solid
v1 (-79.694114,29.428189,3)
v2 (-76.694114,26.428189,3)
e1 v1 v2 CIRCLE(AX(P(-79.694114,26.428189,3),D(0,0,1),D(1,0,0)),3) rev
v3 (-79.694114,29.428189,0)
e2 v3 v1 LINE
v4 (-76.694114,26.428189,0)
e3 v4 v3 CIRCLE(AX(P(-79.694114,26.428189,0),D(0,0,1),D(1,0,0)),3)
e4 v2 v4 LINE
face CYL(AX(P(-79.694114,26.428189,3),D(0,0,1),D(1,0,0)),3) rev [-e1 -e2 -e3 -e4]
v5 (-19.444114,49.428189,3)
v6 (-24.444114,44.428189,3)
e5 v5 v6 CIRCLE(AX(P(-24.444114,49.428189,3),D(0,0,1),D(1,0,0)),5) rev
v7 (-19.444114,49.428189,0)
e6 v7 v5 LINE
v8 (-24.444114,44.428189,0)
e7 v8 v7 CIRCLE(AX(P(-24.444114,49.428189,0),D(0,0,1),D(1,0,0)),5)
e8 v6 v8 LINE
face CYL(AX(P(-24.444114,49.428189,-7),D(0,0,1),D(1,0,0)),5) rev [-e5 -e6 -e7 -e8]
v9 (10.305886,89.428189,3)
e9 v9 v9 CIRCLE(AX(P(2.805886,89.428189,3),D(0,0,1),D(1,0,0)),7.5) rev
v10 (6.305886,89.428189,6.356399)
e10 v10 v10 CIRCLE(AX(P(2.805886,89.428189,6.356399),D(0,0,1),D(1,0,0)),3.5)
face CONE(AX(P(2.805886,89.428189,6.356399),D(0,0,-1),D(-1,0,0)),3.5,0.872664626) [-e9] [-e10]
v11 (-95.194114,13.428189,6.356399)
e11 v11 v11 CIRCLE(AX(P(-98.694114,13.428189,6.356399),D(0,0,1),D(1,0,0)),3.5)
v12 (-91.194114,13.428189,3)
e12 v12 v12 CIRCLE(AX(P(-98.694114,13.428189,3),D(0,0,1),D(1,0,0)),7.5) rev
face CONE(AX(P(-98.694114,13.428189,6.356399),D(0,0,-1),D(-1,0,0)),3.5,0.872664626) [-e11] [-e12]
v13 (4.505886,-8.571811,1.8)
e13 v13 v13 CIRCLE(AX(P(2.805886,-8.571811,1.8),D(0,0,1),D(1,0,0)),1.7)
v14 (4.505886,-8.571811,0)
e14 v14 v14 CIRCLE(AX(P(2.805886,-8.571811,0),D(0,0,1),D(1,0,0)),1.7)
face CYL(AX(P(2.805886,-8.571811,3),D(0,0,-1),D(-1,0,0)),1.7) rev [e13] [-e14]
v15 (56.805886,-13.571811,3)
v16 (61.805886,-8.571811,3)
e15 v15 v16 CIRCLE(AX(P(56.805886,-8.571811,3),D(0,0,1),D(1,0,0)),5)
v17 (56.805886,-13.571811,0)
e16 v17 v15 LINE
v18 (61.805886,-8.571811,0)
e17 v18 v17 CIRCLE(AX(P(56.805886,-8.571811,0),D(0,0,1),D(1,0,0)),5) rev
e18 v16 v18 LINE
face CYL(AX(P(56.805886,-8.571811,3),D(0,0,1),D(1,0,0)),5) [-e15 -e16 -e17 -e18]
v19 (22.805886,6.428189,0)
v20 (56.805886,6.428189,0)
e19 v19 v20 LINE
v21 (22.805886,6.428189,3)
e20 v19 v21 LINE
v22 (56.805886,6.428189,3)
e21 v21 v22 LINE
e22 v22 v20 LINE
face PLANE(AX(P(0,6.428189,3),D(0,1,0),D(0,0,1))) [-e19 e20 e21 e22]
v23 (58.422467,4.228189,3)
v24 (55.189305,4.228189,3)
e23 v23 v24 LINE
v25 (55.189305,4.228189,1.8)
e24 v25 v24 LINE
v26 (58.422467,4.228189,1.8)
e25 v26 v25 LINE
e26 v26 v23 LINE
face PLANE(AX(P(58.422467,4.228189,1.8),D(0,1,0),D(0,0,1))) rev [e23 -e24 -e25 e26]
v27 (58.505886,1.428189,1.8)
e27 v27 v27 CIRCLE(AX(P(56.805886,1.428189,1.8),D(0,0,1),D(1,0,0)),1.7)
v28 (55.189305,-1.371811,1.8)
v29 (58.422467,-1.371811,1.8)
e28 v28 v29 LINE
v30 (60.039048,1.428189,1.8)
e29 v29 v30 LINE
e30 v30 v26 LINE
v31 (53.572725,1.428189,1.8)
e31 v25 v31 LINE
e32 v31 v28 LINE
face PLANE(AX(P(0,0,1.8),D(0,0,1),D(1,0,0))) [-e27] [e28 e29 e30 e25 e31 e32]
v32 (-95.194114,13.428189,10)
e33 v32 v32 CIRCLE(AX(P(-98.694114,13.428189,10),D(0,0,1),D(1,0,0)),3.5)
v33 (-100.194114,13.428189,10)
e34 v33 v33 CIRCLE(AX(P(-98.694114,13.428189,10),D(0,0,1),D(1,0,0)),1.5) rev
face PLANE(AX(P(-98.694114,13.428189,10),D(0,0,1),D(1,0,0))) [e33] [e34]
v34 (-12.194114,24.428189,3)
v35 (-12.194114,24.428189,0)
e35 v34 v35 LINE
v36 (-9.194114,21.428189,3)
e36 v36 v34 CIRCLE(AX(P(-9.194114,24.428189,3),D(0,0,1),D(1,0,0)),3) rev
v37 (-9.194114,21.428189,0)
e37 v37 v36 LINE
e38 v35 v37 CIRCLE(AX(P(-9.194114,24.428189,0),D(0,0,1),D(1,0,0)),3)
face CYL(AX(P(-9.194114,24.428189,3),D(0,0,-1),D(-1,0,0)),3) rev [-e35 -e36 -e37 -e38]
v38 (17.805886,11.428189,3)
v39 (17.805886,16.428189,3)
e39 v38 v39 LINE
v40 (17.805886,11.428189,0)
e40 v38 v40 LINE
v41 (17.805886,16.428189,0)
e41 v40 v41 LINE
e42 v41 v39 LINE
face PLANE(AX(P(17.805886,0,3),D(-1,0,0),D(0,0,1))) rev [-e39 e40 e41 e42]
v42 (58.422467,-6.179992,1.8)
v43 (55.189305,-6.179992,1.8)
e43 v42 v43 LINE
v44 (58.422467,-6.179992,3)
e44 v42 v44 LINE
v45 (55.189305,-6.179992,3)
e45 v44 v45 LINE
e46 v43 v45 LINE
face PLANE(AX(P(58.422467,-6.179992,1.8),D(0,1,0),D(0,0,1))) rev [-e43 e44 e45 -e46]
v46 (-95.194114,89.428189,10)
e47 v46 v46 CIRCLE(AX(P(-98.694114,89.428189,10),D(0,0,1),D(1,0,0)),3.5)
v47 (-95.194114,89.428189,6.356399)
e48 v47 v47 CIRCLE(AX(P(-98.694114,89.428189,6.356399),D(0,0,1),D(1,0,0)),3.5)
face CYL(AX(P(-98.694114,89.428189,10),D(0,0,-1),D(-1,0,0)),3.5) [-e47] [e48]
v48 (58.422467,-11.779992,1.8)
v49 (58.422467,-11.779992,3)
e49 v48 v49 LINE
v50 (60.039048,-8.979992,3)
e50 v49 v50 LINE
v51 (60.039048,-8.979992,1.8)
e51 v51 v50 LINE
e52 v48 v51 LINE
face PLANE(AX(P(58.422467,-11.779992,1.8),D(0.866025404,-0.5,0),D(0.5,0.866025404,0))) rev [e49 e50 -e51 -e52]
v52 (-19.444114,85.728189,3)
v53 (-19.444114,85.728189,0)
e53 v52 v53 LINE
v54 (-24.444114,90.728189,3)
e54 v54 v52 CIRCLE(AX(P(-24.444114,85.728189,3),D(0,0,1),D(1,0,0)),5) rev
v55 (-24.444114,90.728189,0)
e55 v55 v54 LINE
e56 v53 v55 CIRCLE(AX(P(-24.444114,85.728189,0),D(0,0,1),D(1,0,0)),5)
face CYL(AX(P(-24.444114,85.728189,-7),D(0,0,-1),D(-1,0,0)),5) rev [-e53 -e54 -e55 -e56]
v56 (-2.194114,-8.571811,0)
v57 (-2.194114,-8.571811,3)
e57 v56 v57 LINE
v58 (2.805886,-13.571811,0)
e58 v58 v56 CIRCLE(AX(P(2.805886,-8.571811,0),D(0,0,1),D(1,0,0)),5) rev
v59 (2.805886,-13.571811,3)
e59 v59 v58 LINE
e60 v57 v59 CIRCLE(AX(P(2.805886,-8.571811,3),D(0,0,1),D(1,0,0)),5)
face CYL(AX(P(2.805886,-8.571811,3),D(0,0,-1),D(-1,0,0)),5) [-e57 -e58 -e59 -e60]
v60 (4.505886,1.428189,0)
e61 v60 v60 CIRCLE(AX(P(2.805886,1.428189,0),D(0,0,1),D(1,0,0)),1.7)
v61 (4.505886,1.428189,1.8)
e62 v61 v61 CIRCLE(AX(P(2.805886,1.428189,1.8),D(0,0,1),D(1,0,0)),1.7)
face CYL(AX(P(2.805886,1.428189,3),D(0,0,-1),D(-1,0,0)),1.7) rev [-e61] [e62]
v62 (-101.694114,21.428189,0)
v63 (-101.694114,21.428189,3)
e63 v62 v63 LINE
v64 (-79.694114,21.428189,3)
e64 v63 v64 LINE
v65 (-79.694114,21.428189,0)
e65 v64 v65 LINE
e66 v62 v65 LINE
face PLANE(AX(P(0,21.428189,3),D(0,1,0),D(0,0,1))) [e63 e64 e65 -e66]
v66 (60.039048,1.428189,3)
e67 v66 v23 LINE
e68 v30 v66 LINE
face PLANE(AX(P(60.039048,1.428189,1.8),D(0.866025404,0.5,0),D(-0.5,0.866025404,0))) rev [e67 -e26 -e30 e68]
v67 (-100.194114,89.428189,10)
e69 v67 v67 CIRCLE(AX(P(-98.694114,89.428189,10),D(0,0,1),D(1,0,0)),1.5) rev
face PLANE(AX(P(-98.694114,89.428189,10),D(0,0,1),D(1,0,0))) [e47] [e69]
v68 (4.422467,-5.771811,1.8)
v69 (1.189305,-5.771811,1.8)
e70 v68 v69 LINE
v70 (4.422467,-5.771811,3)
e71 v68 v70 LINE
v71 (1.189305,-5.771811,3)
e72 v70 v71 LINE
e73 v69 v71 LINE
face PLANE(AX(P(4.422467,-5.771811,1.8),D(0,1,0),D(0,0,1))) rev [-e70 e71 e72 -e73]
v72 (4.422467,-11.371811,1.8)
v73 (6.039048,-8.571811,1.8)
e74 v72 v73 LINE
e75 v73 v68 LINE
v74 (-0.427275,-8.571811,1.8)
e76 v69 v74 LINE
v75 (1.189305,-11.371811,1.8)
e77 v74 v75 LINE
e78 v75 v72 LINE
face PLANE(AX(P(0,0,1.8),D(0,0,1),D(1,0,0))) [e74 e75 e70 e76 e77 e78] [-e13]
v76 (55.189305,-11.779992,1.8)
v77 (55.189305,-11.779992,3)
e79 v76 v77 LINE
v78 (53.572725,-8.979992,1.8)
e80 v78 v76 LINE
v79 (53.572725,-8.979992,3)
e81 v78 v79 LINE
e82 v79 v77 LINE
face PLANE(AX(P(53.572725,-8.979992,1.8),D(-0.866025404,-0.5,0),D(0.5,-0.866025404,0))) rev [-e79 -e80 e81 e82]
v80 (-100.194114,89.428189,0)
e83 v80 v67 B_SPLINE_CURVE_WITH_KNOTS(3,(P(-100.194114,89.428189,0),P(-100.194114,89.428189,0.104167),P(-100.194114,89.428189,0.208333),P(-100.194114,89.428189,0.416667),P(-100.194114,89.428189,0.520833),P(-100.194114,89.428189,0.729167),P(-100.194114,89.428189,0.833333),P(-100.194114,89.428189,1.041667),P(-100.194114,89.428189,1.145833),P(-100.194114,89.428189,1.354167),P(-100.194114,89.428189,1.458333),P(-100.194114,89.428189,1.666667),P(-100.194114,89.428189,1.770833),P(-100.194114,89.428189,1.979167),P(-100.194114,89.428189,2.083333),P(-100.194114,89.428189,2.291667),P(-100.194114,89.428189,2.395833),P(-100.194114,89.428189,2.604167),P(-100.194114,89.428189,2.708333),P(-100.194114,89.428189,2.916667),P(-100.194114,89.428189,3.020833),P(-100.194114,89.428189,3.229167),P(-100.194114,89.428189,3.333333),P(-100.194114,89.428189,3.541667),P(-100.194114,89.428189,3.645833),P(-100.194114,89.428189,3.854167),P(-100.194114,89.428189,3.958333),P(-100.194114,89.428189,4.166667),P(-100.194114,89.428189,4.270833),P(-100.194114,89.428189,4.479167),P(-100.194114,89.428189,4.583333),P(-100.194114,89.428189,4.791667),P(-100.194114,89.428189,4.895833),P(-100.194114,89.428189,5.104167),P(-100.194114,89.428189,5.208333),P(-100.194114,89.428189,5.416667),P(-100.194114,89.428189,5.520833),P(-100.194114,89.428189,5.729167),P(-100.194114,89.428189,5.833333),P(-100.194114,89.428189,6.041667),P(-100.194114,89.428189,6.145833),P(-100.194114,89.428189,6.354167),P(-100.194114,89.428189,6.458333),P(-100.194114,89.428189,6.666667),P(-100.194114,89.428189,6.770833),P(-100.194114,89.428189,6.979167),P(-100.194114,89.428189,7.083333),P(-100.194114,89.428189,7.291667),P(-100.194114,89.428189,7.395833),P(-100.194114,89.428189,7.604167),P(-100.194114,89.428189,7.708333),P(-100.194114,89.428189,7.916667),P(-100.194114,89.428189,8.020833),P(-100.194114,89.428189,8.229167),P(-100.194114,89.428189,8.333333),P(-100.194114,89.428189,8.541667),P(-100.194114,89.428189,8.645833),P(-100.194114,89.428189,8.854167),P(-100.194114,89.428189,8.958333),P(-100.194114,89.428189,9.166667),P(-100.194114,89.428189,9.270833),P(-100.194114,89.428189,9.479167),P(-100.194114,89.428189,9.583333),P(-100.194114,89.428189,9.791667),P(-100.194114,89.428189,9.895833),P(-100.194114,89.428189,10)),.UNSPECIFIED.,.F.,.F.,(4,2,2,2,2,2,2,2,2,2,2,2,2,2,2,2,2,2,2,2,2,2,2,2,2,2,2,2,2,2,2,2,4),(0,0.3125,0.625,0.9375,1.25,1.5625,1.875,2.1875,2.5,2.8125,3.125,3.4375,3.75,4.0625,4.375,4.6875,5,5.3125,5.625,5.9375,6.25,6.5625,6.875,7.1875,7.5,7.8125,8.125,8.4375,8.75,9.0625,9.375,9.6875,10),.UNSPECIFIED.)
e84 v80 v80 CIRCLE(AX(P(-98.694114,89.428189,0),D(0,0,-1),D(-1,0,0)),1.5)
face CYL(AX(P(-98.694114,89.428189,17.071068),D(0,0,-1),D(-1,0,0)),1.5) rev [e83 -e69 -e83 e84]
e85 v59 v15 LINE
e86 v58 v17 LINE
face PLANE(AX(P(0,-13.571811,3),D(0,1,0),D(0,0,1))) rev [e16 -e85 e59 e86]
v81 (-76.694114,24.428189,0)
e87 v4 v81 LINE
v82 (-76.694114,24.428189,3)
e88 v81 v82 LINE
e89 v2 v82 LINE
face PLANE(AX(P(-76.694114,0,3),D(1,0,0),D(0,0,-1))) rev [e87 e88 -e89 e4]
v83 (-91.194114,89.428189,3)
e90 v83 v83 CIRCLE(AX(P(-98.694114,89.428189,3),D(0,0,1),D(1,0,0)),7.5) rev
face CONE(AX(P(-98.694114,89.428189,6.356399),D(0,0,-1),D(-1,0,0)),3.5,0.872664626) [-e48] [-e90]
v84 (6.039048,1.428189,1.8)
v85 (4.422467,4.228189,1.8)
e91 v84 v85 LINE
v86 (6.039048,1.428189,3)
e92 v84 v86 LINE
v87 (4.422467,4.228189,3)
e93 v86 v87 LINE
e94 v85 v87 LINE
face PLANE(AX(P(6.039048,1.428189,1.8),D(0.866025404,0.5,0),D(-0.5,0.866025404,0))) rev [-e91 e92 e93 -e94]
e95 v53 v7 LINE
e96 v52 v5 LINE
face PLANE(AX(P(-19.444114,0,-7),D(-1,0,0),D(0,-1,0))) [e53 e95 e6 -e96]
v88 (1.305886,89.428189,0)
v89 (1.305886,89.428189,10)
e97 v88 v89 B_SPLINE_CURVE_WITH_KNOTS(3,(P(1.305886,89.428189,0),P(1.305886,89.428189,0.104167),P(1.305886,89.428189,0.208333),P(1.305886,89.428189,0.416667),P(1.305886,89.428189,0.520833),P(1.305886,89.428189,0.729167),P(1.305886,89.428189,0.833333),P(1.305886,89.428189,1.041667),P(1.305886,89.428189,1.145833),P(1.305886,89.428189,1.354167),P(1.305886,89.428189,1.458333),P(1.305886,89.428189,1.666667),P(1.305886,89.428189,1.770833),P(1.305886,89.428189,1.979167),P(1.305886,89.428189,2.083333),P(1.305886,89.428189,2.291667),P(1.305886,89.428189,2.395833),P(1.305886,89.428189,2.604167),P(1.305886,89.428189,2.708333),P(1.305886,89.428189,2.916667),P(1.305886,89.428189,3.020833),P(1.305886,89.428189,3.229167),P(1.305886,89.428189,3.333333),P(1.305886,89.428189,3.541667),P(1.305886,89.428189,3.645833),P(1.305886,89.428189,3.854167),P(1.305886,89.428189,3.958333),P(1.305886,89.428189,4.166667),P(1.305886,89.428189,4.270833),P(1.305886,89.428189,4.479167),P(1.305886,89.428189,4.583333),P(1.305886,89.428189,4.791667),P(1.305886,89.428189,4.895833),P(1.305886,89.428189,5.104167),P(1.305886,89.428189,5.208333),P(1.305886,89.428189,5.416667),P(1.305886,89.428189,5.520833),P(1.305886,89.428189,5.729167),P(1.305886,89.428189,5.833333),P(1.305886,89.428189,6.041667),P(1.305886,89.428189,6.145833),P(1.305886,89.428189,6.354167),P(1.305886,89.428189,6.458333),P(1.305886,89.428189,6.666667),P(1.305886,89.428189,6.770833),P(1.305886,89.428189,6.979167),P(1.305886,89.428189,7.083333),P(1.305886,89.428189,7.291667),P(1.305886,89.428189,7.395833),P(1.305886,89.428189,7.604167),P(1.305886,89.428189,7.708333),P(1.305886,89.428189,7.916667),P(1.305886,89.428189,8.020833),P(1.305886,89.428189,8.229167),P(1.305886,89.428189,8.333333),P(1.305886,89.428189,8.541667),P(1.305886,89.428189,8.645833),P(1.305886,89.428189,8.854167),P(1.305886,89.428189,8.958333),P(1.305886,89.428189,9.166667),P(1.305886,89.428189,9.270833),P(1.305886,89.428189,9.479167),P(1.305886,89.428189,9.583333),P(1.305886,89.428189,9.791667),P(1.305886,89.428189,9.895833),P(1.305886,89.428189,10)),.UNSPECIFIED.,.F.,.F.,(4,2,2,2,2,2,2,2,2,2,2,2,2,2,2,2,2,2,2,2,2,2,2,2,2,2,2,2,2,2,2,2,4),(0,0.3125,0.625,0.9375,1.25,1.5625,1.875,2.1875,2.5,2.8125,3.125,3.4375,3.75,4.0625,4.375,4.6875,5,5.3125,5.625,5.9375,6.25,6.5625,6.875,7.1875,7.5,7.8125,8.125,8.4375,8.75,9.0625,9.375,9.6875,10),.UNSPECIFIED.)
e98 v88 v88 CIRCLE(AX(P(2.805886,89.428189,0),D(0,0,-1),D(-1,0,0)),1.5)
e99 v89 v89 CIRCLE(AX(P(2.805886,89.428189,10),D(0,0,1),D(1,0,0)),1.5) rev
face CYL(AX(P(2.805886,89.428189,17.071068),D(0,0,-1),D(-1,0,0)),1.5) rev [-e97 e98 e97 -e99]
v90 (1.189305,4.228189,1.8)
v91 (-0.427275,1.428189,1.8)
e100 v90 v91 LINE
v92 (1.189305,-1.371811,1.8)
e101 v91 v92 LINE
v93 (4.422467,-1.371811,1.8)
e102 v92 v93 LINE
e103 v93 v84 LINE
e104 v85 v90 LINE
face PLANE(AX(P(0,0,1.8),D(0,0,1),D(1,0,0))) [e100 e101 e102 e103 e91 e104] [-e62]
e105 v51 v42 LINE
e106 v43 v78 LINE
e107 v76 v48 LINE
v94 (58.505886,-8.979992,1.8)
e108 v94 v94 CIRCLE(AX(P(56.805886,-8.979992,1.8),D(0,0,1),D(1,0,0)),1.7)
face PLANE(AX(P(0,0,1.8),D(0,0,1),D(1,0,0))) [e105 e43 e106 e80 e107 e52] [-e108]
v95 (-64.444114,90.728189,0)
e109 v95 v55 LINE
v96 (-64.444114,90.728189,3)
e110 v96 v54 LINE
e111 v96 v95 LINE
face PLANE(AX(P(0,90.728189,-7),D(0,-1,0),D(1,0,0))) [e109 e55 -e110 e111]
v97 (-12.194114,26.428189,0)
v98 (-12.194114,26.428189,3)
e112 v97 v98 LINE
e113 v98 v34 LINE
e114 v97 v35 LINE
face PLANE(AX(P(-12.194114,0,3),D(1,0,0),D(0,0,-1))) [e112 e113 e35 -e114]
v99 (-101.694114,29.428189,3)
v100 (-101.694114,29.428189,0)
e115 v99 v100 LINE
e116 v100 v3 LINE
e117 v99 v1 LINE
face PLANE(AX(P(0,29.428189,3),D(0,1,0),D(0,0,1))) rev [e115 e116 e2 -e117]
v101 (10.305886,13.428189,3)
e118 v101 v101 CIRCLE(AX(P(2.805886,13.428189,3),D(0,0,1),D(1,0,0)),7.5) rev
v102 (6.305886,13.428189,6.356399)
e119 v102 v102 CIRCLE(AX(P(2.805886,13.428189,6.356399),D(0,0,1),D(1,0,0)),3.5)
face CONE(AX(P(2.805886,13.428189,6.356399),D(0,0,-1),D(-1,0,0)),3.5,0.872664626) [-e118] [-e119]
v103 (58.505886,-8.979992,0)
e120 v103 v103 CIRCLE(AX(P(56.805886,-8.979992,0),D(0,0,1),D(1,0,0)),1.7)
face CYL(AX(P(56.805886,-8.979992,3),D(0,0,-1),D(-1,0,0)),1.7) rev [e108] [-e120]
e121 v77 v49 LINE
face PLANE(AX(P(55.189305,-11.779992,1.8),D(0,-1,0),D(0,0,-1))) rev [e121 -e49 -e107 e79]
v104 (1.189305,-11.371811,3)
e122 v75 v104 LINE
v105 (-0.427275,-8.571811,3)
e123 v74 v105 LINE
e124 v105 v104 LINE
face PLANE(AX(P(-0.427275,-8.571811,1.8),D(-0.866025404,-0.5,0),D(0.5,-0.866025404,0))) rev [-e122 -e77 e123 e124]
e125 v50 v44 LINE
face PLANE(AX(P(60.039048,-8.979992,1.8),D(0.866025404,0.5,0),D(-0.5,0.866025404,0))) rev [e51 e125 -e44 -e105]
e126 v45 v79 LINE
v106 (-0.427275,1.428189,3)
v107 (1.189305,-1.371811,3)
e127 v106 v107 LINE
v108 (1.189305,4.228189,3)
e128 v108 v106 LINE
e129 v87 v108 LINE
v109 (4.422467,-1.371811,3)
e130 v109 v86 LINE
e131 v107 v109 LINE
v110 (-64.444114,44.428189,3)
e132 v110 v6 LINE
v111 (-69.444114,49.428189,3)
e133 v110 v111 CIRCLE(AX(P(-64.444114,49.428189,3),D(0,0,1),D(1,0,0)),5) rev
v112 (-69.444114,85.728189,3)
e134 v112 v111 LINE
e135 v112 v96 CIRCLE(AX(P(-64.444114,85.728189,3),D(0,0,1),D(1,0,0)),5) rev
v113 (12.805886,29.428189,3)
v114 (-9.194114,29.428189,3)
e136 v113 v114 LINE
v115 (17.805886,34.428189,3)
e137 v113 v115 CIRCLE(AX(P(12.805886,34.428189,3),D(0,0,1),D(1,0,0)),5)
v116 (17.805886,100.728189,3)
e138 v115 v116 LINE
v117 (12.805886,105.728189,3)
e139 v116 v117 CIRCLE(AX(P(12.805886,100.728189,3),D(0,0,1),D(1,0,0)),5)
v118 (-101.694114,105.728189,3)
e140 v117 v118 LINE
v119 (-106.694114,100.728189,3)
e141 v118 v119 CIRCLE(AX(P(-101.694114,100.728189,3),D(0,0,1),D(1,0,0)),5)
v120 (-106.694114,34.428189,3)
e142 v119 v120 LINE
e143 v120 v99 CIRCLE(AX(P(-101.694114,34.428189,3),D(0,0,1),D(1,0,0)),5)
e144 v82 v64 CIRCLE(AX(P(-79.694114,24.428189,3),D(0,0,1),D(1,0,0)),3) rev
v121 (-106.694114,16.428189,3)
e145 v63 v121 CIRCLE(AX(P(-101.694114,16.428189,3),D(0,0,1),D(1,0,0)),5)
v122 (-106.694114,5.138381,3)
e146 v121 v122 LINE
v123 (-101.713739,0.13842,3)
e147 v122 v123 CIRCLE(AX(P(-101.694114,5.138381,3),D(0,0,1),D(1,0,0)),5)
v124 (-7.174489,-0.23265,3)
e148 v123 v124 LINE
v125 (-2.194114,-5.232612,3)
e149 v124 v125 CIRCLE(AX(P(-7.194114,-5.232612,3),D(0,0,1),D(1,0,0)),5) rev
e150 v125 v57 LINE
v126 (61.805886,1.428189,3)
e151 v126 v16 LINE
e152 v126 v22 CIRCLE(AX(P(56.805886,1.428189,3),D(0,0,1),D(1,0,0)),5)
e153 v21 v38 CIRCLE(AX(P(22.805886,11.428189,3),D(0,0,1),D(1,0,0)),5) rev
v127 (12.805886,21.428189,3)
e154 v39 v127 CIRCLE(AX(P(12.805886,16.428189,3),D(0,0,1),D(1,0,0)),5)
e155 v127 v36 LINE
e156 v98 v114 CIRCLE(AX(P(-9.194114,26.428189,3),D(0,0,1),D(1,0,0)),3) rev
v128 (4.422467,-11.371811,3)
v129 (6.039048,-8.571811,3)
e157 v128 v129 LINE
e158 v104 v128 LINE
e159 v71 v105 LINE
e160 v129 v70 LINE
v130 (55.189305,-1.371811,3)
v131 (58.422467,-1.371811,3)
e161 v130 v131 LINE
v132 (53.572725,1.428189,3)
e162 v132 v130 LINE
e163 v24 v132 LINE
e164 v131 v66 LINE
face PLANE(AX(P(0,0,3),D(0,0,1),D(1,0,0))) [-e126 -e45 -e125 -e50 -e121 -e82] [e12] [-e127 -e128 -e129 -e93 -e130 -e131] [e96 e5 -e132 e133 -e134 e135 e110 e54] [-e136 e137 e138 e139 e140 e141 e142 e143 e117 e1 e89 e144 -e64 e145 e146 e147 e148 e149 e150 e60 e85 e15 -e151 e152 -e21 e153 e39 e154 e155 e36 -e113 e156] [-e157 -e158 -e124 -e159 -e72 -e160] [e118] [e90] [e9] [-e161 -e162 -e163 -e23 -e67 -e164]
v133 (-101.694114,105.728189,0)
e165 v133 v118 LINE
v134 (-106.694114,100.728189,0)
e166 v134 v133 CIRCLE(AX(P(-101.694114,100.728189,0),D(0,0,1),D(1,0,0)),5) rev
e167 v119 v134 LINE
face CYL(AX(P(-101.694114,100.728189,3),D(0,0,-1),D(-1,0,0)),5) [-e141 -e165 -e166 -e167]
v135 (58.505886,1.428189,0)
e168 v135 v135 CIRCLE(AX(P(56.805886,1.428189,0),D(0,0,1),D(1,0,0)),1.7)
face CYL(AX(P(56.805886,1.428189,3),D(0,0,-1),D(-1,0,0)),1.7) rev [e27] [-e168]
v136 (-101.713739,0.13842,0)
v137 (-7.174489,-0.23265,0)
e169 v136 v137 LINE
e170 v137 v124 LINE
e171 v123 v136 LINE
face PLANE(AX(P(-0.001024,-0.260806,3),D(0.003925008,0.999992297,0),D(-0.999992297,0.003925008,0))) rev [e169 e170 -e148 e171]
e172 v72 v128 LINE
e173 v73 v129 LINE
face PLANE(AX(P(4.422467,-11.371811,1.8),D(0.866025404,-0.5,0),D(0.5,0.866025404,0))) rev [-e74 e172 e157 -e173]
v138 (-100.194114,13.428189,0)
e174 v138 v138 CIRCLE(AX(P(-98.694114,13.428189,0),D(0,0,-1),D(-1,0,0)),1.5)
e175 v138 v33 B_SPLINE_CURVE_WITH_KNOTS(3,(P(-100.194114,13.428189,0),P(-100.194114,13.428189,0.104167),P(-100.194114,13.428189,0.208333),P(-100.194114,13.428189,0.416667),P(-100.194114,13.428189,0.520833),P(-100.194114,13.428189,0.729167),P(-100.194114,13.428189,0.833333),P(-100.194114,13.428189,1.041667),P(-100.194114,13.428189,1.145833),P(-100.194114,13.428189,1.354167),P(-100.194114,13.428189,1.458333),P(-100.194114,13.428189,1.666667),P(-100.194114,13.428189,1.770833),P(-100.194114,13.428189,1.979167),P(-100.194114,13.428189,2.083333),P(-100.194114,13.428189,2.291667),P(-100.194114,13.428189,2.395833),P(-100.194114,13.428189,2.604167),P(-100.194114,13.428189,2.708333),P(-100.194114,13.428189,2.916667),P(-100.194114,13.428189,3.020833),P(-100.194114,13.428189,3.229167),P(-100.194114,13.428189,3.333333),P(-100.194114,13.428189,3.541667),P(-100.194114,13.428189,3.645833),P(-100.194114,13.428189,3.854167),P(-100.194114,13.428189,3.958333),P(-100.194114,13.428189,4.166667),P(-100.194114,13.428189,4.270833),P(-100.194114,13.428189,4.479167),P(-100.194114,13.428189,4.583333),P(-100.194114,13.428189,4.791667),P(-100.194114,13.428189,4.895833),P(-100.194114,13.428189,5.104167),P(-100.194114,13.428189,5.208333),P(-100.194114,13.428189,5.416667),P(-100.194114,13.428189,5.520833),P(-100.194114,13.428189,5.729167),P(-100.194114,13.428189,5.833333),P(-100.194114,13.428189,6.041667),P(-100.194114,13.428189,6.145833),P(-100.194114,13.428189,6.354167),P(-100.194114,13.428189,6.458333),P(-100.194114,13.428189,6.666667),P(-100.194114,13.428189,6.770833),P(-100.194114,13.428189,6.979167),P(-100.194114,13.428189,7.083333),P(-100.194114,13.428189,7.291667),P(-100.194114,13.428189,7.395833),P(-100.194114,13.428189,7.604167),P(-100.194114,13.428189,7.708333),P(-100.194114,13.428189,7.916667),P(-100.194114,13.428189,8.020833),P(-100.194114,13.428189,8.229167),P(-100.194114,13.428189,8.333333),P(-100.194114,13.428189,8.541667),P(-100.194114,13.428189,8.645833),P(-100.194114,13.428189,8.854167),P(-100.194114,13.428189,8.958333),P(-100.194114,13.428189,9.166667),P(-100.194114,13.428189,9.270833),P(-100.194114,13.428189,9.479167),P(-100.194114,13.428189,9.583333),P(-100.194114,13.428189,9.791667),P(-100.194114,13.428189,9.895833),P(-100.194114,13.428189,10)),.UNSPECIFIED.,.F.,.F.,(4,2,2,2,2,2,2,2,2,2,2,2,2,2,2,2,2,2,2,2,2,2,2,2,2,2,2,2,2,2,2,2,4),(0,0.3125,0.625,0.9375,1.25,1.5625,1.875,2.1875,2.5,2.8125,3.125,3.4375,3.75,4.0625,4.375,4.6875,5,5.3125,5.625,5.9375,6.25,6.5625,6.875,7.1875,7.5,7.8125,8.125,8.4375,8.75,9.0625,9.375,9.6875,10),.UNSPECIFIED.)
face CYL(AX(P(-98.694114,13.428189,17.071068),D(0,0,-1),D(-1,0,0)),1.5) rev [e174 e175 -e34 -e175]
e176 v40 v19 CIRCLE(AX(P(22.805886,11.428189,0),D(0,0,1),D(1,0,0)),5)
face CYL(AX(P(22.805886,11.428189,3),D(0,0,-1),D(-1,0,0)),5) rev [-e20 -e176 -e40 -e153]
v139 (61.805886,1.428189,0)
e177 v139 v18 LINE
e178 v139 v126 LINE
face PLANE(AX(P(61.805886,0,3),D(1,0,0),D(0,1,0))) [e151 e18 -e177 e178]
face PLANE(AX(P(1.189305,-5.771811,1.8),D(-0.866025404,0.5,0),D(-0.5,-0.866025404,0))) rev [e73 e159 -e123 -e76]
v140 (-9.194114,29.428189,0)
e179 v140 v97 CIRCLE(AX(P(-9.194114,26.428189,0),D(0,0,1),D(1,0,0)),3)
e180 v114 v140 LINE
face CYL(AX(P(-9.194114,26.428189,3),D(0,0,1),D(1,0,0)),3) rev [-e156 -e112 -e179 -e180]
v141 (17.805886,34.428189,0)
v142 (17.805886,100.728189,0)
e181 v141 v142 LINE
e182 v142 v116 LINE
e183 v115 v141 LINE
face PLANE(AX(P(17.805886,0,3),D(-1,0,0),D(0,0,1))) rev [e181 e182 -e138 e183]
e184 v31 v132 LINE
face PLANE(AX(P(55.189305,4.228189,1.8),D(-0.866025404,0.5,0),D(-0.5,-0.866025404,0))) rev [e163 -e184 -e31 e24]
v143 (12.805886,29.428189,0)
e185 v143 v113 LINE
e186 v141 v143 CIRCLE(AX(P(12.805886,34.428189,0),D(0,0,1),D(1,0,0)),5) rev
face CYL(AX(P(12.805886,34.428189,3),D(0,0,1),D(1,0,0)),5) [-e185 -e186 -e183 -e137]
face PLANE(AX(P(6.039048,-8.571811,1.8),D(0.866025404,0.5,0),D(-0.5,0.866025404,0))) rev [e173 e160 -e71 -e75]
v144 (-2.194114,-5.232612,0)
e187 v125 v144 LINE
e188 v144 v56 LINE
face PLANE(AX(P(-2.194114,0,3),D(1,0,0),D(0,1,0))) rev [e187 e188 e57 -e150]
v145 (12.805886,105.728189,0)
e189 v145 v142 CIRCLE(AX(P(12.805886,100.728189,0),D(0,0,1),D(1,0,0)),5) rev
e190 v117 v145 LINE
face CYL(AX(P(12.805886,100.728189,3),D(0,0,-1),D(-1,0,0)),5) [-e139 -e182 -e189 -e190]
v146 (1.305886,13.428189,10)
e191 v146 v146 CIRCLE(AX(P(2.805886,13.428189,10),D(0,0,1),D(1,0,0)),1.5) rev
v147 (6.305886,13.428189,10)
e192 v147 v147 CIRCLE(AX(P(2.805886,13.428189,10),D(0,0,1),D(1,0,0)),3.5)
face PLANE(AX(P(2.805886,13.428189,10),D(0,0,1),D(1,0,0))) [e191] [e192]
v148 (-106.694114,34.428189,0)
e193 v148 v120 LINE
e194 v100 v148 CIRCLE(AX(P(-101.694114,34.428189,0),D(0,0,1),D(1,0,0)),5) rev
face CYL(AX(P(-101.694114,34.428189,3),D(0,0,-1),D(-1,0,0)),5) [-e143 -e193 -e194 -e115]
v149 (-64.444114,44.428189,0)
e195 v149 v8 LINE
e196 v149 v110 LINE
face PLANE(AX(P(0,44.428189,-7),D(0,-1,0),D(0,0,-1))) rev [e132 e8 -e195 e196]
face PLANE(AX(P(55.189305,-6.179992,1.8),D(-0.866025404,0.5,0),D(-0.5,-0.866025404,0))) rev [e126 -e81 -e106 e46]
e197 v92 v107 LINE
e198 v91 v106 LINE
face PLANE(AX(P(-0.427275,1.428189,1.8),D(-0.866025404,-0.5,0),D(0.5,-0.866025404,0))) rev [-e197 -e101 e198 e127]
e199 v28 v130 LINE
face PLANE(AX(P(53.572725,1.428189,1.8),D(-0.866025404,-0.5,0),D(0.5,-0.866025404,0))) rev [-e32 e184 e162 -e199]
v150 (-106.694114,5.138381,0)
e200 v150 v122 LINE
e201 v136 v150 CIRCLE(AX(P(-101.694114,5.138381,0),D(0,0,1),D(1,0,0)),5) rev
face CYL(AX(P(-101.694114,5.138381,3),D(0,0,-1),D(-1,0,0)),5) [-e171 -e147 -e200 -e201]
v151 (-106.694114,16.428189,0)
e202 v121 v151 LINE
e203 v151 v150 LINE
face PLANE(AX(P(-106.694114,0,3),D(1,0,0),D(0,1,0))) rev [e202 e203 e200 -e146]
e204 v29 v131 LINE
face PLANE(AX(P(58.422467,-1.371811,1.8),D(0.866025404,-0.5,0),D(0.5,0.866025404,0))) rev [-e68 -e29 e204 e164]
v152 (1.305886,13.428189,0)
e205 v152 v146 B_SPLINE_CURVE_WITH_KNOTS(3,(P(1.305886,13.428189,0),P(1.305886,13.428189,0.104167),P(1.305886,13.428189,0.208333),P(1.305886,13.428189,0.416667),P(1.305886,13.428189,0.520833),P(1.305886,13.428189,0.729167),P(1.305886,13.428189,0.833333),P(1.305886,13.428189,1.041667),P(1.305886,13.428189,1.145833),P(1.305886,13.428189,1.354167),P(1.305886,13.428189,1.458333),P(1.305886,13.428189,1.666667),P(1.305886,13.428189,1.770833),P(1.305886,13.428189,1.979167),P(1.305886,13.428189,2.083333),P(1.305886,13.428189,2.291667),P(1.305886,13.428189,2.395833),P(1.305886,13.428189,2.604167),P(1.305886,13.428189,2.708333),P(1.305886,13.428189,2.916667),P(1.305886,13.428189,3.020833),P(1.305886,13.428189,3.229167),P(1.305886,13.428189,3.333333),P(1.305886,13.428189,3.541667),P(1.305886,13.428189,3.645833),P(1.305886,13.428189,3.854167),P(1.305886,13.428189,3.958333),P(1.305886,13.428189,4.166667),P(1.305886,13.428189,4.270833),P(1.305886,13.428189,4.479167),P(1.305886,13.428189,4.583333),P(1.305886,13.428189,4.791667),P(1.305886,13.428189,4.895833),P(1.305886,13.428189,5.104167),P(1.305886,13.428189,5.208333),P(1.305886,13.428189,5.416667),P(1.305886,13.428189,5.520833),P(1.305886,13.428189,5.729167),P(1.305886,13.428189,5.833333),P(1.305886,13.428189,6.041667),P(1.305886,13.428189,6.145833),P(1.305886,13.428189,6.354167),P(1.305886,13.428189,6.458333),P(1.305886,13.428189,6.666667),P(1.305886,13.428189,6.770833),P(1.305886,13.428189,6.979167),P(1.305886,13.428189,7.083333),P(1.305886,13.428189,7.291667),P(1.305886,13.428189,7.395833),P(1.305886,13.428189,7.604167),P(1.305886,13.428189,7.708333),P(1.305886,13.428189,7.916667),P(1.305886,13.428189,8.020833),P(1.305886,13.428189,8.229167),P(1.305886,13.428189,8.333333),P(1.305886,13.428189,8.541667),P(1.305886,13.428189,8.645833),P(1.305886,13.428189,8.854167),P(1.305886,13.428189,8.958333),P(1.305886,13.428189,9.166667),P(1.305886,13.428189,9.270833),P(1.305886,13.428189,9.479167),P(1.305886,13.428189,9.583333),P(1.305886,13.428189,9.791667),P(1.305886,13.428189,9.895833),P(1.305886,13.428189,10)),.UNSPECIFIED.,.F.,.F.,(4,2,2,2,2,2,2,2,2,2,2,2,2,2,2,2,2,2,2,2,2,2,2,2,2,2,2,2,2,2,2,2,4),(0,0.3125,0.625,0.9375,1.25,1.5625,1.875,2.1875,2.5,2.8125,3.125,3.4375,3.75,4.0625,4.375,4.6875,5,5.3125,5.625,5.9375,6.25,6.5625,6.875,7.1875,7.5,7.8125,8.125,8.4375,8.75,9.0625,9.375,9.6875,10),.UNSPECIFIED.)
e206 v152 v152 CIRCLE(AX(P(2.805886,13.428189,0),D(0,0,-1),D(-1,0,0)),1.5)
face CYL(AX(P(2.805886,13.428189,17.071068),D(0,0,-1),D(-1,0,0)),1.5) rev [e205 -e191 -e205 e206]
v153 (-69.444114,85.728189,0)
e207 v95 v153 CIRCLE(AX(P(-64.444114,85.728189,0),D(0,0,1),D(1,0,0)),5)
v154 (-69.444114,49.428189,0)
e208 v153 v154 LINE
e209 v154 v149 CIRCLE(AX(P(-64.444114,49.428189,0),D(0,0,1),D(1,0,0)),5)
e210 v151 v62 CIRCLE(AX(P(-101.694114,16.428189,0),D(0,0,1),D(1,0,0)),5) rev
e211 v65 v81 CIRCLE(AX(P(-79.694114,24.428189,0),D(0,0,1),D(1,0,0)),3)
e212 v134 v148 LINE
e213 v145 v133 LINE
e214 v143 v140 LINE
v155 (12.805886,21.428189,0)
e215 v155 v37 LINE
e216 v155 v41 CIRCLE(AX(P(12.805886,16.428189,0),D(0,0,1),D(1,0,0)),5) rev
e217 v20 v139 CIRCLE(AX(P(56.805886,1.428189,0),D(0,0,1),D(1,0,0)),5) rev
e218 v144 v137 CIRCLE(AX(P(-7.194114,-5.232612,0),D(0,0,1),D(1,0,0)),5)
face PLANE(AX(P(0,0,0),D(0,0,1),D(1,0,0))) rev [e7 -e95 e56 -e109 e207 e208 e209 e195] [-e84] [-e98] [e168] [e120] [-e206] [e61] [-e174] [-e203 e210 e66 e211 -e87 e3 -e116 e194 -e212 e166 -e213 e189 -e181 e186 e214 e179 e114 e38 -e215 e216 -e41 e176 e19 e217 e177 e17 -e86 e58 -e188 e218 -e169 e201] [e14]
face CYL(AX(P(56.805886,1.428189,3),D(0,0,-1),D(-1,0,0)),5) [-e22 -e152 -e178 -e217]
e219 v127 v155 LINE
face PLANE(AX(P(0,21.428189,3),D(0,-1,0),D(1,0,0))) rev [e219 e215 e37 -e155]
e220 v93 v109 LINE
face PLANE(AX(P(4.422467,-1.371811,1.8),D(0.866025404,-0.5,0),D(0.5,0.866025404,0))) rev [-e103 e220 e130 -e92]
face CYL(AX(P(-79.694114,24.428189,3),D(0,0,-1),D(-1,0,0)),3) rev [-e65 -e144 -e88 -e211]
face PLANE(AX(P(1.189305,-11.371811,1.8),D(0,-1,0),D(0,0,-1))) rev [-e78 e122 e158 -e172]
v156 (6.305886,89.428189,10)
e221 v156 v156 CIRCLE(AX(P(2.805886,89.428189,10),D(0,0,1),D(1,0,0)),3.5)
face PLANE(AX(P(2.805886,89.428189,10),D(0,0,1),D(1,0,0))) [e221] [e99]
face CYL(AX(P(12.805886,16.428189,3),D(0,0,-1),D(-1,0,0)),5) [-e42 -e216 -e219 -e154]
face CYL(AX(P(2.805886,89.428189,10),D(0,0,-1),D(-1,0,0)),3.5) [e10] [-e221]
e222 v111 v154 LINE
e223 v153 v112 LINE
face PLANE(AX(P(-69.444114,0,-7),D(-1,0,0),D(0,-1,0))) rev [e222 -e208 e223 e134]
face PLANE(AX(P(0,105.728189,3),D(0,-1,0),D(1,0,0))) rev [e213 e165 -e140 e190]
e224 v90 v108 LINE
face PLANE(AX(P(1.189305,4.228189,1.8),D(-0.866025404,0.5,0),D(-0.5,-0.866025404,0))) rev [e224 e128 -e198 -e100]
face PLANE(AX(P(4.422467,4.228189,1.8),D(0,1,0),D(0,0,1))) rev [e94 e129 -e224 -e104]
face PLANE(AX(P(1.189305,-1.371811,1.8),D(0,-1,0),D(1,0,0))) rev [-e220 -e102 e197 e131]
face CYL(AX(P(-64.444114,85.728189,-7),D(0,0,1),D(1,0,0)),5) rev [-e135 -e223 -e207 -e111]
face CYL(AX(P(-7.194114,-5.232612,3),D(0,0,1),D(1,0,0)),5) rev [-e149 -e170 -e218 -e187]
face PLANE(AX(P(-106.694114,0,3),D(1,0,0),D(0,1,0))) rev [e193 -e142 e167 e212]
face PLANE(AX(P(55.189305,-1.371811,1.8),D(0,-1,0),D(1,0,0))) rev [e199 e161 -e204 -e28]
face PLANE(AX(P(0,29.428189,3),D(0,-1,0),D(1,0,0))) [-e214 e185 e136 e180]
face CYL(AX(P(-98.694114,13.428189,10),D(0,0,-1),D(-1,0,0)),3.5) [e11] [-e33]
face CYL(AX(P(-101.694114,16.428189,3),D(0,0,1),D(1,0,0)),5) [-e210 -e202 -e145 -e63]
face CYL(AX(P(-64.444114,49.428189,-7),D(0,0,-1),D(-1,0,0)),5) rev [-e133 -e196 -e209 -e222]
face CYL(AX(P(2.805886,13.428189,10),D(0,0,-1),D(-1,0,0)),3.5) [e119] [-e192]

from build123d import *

# Parameters (mm, degrees)
EXTRUDE_1_OUTLINE_R = 1.7
EXTRUDE_1_DEPTH     = 3
FILLET_1_R          = 3
FILLET_2_R          = 5
SKETCH_2_R          = 3.5
EXTRUDE_2_DEPTH     = 7
CHAMFER_1_SIZE      = 4
CHAMFER_1_SIZE2     = 3.356398525
SKETCH_3_R          = 1.6
CUT_EXTRUDE_1_DEPTH = 50
CUT_EXTRUDE_2_DEPTH = 1.2
CUT_EXTRUDE_3_DEPTH = 10
FILLET_3_R          = 5
EXTRUDE_START       = -10
SKETCH_6_R          = 2.5
SKETCH_6_R_2        = 1.5
EXTRUDE_1_2_DEPTH   = 10


# Read off the part's stored shape, not the designer's step: 보스-돌출1
with BuildPart() as part:
    # Extrude 1 outline → Extrude 1 (new body)
    with BuildSketch(Plane.XY):
        Polygon((61.805886205, -13.571810541), (61.805886205, 6.428189459), (17.805886205, 6.428189459), (17.805886205, 21.428189459), (-12.194113795, 21.428189459), (-12.194113795, 29.428189459), (17.805886205, 29.428189459), (17.805886205, 105.728189459), (-106.694113795, 105.728189459), (-106.694113795, 29.428189459), (-76.694113795, 29.428189459), (-76.694113795, 21.428189459), (-106.694113795, 21.428189459), (-106.694113795, 0.157968071), (-2.194113795, -0.252198443), (-2.194113795, -13.571810541), align=None)
        with Locations((-98.694113795, 13.428189459)):
            Circle(EXTRUDE_1_OUTLINE_R, mode=Mode.SUBTRACT)
        with Locations((2.805886205, -8.571810541)):
            Circle(EXTRUDE_1_OUTLINE_R, mode=Mode.SUBTRACT)
        with Locations((2.805886205, 1.428189459)):
            Circle(EXTRUDE_1_OUTLINE_R, mode=Mode.SUBTRACT)
        with Locations((2.805886205, 13.428189459)):
            Circle(EXTRUDE_1_OUTLINE_R, mode=Mode.SUBTRACT)
        with Locations((56.805886205, -8.979991995)):
            Circle(EXTRUDE_1_OUTLINE_R, mode=Mode.SUBTRACT)
        with Locations((56.805886205, 1.428189459)):
            Circle(EXTRUDE_1_OUTLINE_R, mode=Mode.SUBTRACT)
        with Locations((-98.694113795, 89.428189459)):
            Circle(EXTRUDE_1_OUTLINE_R, mode=Mode.SUBTRACT)
        with Locations((2.805886205, 89.428189459)):
            Circle(EXTRUDE_1_OUTLINE_R, mode=Mode.SUBTRACT)
    extrude(amount=EXTRUDE_1_DEPTH)

    # 필렛1
    fillet_1_edges = [part.edges().sort_by_distance(p)[0] for p in [
        (-76.694113795, 21.428189459, 1.5),
        (-76.694113795, 29.428189459, 1.5),
        (-12.194113795, 29.428189459, 1.5),
        (-12.194113795, 21.428189459, 1.5),
    ]]
    fillet(fillet_1_edges, radius=FILLET_1_R)

    # 필렛2
    fillet_2_edges = [part.edges().sort_by_distance(p)[0] for p in [
        (61.805886205, 6.428189459, 1.5),
        (61.805886205, -13.571810541, 1.5),
        (-2.194113795, -13.571810541, 1.5),
        (-2.194113795, -0.252198443, 1.5),
        (-106.694113795, 0.157968071, 1.5),
        (-106.694113795, 21.428189459, 1.5),
        (-106.694113795, 29.428189459, 1.5),
        (-106.694113795, 105.728189459, 1.5),
        (17.805886205, 105.728189459, 1.5),
        (17.805886205, 29.428189459, 1.5),
        (17.805886205, 21.428189459, 1.5),
        (17.805886205, 6.428189459, 1.5),
    ]]
    fillet(fillet_2_edges, radius=FILLET_2_R)

    # 스케치2 → 보스-돌출2 (add)
    with BuildSketch(Plane.XY.offset(3)):
        with Locations((-98.694113795, 89.428189459)):
            Circle(SKETCH_2_R)
        with Locations((2.805886205, 89.428189459)):
            Circle(SKETCH_2_R)
        with Locations((-98.694113795, 13.428189459)):
            Circle(SKETCH_2_R)
        with Locations((2.805886205, 13.428189459)):
            Circle(SKETCH_2_R)
    extrude(amount=EXTRUDE_2_DEPTH)

    # 모따기1
    chamfer_1_edges = [part.edges().sort_by_distance(p)[0] for p in [
        (-102.194113795, 89.428189459, 3),
        (-0.694113795, 89.428189459, 3),
        (-102.194113795, 13.428189459, 3),
        (-0.694113795, 13.428189459, 3),
    ]]
    chamfer_1_side = [part.faces().sort_by_distance(p)[0] for p in [
        (-38.126255905, 49.180268575, 3),
    ]]
    chamfer(chamfer_1_edges, length=CHAMFER_1_SIZE, length2=CHAMFER_1_SIZE2, reference=chamfer_1_side[0])

    # 스케치3 → 컷-돌출1 (cut)
    with BuildSketch(Plane(origin=(0, 0, 0), x_dir=(-1, 0, 0), z_dir=(0, 0, -1))):
        with Locations(Location((-2.805886205, 89.428189459, 0), (0, 0, 180))):
            Circle(SKETCH_3_R)
        with Locations(Location((-2.805886205, 13.428189459, 0), (0, 0, 180))):
            Circle(SKETCH_3_R)
        with Locations(Location((98.694113795, 13.428189459, 0), (0, 0, 180))):
            Circle(SKETCH_3_R)
        with Locations(Location((98.694113795, 89.428189459, 0), (0, 0, 180))):
            Circle(SKETCH_3_R)
    extrude(amount=-CUT_EXTRUDE_1_DEPTH, mode=Mode.SUBTRACT)

    # 스케치4 → 컷-돌출2 (cut)
    with BuildSketch(Plane.XY.offset(3)):
        Polygon((6.039047712, 1.428189459), (4.422466959, 4.228189459), (1.189305451, 4.228189459), (-0.427275303, 1.428189459), (1.189305451, -1.371810541), (4.422466959, -1.371810541), align=None)
        Polygon((6.039047712, -8.571810541), (4.422466959, -5.771810541), (1.189305451, -5.771810541), (-0.427275303, -8.571810541), (1.189305451, -11.371810541), (4.422466959, -11.371810541), align=None)
        Polygon((53.572724697, 1.428189459), (55.189305451, -1.371810541), (58.422466959, -1.371810541), (60.039047712, 1.428189459), (58.422466959, 4.228189459), (55.189305451, 4.228189459), align=None)
        Polygon((53.572724697, -8.979991995), (55.189305451, -11.779991995), (58.422466959, -11.779991995), (60.039047712, -8.979991995), (58.422466959, -6.179991995), (55.189305451, -6.179991995), align=None)
    extrude(amount=-CUT_EXTRUDE_2_DEPTH, mode=Mode.SUBTRACT)

    # 스케치5 → 컷-돌출3 (cut)
    with BuildSketch(Plane.XY.offset(3)):
        Polygon((-44.444113795, 90.728189459), (-44.444113795, 52.86409473), (-34.510431855, 44.428189459), (-19.444113795, 44.428189459), (-19.444113795, 90.728189459), align=None)
        Polygon((-69.444113795, 90.728189459), (-69.444113795, 74.094654862), (-44.444113795, 52.86409473), (-44.444113795, 90.728189459), align=None)
        Polygon((-44.444113795, 52.86409473), (-69.444113795, 74.094654862), (-69.444113795, 44.428189459), (-34.510431855, 44.428189459), align=None)
    extrude(amount=-CUT_EXTRUDE_3_DEPTH, mode=Mode.SUBTRACT)

    # 필렛3
    fillet_3_edges = [part.edges().sort_by_distance(p)[0] for p in [
        (-19.444113795, 90.728189459, 1.5),
        (-19.444113795, 44.428189459, 1.5),
        (-69.444113795, 44.428189459, 1.5),
        (-69.444113795, 90.728189459, 1.5),
    ]]
    fillet(fillet_3_edges, radius=FILLET_3_R)

    # 스케치6 → Extrude 1 2 (add)
    # profile 1 of 4: a face of its own
    with BuildSketch(Plane(origin=(0, 0, 0), x_dir=(-1, 0, 0), z_dir=(0, 0, -1)).offset(EXTRUDE_START)):
        with Locations((-2.805886205, 89.428189459)):
            Circle(SKETCH_6_R)
        with Locations((-2.805886205, 89.428189459)):
            Circle(SKETCH_6_R_2, mode=Mode.SUBTRACT)
    # profile 2 of 4: a face of its own
    with BuildSketch(Plane(origin=(0, 0, 0), x_dir=(-1, 0, 0), z_dir=(0, 0, -1)).offset(EXTRUDE_START)):
        with Locations((-2.805886205, 13.428189459)):
            Circle(SKETCH_6_R)
        with Locations((-2.805886205, 13.428189459)):
            Circle(SKETCH_6_R_2, mode=Mode.SUBTRACT)
    # profile 3 of 4: a face of its own
    with BuildSketch(Plane(origin=(0, 0, 0), x_dir=(-1, 0, 0), z_dir=(0, 0, -1)).offset(EXTRUDE_START)):
        with Locations((98.694113795, 13.428189459)):
            Circle(SKETCH_6_R)
        with Locations((98.694113795, 13.428189459)):
            Circle(SKETCH_6_R_2, mode=Mode.SUBTRACT)
    # profile 4 of 4: a face of its own
    with BuildSketch(Plane(origin=(0, 0, 0), x_dir=(-1, 0, 0), z_dir=(0, 0, -1)).offset(EXTRUDE_START)):
        with Locations((98.694113795, 89.428189459)):
            Circle(SKETCH_6_R)
        with Locations((98.694113795, 89.428189459)):
            Circle(SKETCH_6_R_2, mode=Mode.SUBTRACT)
    extrude(amount=EXTRUDE_1_2_DEPTH)


solid = part.part
